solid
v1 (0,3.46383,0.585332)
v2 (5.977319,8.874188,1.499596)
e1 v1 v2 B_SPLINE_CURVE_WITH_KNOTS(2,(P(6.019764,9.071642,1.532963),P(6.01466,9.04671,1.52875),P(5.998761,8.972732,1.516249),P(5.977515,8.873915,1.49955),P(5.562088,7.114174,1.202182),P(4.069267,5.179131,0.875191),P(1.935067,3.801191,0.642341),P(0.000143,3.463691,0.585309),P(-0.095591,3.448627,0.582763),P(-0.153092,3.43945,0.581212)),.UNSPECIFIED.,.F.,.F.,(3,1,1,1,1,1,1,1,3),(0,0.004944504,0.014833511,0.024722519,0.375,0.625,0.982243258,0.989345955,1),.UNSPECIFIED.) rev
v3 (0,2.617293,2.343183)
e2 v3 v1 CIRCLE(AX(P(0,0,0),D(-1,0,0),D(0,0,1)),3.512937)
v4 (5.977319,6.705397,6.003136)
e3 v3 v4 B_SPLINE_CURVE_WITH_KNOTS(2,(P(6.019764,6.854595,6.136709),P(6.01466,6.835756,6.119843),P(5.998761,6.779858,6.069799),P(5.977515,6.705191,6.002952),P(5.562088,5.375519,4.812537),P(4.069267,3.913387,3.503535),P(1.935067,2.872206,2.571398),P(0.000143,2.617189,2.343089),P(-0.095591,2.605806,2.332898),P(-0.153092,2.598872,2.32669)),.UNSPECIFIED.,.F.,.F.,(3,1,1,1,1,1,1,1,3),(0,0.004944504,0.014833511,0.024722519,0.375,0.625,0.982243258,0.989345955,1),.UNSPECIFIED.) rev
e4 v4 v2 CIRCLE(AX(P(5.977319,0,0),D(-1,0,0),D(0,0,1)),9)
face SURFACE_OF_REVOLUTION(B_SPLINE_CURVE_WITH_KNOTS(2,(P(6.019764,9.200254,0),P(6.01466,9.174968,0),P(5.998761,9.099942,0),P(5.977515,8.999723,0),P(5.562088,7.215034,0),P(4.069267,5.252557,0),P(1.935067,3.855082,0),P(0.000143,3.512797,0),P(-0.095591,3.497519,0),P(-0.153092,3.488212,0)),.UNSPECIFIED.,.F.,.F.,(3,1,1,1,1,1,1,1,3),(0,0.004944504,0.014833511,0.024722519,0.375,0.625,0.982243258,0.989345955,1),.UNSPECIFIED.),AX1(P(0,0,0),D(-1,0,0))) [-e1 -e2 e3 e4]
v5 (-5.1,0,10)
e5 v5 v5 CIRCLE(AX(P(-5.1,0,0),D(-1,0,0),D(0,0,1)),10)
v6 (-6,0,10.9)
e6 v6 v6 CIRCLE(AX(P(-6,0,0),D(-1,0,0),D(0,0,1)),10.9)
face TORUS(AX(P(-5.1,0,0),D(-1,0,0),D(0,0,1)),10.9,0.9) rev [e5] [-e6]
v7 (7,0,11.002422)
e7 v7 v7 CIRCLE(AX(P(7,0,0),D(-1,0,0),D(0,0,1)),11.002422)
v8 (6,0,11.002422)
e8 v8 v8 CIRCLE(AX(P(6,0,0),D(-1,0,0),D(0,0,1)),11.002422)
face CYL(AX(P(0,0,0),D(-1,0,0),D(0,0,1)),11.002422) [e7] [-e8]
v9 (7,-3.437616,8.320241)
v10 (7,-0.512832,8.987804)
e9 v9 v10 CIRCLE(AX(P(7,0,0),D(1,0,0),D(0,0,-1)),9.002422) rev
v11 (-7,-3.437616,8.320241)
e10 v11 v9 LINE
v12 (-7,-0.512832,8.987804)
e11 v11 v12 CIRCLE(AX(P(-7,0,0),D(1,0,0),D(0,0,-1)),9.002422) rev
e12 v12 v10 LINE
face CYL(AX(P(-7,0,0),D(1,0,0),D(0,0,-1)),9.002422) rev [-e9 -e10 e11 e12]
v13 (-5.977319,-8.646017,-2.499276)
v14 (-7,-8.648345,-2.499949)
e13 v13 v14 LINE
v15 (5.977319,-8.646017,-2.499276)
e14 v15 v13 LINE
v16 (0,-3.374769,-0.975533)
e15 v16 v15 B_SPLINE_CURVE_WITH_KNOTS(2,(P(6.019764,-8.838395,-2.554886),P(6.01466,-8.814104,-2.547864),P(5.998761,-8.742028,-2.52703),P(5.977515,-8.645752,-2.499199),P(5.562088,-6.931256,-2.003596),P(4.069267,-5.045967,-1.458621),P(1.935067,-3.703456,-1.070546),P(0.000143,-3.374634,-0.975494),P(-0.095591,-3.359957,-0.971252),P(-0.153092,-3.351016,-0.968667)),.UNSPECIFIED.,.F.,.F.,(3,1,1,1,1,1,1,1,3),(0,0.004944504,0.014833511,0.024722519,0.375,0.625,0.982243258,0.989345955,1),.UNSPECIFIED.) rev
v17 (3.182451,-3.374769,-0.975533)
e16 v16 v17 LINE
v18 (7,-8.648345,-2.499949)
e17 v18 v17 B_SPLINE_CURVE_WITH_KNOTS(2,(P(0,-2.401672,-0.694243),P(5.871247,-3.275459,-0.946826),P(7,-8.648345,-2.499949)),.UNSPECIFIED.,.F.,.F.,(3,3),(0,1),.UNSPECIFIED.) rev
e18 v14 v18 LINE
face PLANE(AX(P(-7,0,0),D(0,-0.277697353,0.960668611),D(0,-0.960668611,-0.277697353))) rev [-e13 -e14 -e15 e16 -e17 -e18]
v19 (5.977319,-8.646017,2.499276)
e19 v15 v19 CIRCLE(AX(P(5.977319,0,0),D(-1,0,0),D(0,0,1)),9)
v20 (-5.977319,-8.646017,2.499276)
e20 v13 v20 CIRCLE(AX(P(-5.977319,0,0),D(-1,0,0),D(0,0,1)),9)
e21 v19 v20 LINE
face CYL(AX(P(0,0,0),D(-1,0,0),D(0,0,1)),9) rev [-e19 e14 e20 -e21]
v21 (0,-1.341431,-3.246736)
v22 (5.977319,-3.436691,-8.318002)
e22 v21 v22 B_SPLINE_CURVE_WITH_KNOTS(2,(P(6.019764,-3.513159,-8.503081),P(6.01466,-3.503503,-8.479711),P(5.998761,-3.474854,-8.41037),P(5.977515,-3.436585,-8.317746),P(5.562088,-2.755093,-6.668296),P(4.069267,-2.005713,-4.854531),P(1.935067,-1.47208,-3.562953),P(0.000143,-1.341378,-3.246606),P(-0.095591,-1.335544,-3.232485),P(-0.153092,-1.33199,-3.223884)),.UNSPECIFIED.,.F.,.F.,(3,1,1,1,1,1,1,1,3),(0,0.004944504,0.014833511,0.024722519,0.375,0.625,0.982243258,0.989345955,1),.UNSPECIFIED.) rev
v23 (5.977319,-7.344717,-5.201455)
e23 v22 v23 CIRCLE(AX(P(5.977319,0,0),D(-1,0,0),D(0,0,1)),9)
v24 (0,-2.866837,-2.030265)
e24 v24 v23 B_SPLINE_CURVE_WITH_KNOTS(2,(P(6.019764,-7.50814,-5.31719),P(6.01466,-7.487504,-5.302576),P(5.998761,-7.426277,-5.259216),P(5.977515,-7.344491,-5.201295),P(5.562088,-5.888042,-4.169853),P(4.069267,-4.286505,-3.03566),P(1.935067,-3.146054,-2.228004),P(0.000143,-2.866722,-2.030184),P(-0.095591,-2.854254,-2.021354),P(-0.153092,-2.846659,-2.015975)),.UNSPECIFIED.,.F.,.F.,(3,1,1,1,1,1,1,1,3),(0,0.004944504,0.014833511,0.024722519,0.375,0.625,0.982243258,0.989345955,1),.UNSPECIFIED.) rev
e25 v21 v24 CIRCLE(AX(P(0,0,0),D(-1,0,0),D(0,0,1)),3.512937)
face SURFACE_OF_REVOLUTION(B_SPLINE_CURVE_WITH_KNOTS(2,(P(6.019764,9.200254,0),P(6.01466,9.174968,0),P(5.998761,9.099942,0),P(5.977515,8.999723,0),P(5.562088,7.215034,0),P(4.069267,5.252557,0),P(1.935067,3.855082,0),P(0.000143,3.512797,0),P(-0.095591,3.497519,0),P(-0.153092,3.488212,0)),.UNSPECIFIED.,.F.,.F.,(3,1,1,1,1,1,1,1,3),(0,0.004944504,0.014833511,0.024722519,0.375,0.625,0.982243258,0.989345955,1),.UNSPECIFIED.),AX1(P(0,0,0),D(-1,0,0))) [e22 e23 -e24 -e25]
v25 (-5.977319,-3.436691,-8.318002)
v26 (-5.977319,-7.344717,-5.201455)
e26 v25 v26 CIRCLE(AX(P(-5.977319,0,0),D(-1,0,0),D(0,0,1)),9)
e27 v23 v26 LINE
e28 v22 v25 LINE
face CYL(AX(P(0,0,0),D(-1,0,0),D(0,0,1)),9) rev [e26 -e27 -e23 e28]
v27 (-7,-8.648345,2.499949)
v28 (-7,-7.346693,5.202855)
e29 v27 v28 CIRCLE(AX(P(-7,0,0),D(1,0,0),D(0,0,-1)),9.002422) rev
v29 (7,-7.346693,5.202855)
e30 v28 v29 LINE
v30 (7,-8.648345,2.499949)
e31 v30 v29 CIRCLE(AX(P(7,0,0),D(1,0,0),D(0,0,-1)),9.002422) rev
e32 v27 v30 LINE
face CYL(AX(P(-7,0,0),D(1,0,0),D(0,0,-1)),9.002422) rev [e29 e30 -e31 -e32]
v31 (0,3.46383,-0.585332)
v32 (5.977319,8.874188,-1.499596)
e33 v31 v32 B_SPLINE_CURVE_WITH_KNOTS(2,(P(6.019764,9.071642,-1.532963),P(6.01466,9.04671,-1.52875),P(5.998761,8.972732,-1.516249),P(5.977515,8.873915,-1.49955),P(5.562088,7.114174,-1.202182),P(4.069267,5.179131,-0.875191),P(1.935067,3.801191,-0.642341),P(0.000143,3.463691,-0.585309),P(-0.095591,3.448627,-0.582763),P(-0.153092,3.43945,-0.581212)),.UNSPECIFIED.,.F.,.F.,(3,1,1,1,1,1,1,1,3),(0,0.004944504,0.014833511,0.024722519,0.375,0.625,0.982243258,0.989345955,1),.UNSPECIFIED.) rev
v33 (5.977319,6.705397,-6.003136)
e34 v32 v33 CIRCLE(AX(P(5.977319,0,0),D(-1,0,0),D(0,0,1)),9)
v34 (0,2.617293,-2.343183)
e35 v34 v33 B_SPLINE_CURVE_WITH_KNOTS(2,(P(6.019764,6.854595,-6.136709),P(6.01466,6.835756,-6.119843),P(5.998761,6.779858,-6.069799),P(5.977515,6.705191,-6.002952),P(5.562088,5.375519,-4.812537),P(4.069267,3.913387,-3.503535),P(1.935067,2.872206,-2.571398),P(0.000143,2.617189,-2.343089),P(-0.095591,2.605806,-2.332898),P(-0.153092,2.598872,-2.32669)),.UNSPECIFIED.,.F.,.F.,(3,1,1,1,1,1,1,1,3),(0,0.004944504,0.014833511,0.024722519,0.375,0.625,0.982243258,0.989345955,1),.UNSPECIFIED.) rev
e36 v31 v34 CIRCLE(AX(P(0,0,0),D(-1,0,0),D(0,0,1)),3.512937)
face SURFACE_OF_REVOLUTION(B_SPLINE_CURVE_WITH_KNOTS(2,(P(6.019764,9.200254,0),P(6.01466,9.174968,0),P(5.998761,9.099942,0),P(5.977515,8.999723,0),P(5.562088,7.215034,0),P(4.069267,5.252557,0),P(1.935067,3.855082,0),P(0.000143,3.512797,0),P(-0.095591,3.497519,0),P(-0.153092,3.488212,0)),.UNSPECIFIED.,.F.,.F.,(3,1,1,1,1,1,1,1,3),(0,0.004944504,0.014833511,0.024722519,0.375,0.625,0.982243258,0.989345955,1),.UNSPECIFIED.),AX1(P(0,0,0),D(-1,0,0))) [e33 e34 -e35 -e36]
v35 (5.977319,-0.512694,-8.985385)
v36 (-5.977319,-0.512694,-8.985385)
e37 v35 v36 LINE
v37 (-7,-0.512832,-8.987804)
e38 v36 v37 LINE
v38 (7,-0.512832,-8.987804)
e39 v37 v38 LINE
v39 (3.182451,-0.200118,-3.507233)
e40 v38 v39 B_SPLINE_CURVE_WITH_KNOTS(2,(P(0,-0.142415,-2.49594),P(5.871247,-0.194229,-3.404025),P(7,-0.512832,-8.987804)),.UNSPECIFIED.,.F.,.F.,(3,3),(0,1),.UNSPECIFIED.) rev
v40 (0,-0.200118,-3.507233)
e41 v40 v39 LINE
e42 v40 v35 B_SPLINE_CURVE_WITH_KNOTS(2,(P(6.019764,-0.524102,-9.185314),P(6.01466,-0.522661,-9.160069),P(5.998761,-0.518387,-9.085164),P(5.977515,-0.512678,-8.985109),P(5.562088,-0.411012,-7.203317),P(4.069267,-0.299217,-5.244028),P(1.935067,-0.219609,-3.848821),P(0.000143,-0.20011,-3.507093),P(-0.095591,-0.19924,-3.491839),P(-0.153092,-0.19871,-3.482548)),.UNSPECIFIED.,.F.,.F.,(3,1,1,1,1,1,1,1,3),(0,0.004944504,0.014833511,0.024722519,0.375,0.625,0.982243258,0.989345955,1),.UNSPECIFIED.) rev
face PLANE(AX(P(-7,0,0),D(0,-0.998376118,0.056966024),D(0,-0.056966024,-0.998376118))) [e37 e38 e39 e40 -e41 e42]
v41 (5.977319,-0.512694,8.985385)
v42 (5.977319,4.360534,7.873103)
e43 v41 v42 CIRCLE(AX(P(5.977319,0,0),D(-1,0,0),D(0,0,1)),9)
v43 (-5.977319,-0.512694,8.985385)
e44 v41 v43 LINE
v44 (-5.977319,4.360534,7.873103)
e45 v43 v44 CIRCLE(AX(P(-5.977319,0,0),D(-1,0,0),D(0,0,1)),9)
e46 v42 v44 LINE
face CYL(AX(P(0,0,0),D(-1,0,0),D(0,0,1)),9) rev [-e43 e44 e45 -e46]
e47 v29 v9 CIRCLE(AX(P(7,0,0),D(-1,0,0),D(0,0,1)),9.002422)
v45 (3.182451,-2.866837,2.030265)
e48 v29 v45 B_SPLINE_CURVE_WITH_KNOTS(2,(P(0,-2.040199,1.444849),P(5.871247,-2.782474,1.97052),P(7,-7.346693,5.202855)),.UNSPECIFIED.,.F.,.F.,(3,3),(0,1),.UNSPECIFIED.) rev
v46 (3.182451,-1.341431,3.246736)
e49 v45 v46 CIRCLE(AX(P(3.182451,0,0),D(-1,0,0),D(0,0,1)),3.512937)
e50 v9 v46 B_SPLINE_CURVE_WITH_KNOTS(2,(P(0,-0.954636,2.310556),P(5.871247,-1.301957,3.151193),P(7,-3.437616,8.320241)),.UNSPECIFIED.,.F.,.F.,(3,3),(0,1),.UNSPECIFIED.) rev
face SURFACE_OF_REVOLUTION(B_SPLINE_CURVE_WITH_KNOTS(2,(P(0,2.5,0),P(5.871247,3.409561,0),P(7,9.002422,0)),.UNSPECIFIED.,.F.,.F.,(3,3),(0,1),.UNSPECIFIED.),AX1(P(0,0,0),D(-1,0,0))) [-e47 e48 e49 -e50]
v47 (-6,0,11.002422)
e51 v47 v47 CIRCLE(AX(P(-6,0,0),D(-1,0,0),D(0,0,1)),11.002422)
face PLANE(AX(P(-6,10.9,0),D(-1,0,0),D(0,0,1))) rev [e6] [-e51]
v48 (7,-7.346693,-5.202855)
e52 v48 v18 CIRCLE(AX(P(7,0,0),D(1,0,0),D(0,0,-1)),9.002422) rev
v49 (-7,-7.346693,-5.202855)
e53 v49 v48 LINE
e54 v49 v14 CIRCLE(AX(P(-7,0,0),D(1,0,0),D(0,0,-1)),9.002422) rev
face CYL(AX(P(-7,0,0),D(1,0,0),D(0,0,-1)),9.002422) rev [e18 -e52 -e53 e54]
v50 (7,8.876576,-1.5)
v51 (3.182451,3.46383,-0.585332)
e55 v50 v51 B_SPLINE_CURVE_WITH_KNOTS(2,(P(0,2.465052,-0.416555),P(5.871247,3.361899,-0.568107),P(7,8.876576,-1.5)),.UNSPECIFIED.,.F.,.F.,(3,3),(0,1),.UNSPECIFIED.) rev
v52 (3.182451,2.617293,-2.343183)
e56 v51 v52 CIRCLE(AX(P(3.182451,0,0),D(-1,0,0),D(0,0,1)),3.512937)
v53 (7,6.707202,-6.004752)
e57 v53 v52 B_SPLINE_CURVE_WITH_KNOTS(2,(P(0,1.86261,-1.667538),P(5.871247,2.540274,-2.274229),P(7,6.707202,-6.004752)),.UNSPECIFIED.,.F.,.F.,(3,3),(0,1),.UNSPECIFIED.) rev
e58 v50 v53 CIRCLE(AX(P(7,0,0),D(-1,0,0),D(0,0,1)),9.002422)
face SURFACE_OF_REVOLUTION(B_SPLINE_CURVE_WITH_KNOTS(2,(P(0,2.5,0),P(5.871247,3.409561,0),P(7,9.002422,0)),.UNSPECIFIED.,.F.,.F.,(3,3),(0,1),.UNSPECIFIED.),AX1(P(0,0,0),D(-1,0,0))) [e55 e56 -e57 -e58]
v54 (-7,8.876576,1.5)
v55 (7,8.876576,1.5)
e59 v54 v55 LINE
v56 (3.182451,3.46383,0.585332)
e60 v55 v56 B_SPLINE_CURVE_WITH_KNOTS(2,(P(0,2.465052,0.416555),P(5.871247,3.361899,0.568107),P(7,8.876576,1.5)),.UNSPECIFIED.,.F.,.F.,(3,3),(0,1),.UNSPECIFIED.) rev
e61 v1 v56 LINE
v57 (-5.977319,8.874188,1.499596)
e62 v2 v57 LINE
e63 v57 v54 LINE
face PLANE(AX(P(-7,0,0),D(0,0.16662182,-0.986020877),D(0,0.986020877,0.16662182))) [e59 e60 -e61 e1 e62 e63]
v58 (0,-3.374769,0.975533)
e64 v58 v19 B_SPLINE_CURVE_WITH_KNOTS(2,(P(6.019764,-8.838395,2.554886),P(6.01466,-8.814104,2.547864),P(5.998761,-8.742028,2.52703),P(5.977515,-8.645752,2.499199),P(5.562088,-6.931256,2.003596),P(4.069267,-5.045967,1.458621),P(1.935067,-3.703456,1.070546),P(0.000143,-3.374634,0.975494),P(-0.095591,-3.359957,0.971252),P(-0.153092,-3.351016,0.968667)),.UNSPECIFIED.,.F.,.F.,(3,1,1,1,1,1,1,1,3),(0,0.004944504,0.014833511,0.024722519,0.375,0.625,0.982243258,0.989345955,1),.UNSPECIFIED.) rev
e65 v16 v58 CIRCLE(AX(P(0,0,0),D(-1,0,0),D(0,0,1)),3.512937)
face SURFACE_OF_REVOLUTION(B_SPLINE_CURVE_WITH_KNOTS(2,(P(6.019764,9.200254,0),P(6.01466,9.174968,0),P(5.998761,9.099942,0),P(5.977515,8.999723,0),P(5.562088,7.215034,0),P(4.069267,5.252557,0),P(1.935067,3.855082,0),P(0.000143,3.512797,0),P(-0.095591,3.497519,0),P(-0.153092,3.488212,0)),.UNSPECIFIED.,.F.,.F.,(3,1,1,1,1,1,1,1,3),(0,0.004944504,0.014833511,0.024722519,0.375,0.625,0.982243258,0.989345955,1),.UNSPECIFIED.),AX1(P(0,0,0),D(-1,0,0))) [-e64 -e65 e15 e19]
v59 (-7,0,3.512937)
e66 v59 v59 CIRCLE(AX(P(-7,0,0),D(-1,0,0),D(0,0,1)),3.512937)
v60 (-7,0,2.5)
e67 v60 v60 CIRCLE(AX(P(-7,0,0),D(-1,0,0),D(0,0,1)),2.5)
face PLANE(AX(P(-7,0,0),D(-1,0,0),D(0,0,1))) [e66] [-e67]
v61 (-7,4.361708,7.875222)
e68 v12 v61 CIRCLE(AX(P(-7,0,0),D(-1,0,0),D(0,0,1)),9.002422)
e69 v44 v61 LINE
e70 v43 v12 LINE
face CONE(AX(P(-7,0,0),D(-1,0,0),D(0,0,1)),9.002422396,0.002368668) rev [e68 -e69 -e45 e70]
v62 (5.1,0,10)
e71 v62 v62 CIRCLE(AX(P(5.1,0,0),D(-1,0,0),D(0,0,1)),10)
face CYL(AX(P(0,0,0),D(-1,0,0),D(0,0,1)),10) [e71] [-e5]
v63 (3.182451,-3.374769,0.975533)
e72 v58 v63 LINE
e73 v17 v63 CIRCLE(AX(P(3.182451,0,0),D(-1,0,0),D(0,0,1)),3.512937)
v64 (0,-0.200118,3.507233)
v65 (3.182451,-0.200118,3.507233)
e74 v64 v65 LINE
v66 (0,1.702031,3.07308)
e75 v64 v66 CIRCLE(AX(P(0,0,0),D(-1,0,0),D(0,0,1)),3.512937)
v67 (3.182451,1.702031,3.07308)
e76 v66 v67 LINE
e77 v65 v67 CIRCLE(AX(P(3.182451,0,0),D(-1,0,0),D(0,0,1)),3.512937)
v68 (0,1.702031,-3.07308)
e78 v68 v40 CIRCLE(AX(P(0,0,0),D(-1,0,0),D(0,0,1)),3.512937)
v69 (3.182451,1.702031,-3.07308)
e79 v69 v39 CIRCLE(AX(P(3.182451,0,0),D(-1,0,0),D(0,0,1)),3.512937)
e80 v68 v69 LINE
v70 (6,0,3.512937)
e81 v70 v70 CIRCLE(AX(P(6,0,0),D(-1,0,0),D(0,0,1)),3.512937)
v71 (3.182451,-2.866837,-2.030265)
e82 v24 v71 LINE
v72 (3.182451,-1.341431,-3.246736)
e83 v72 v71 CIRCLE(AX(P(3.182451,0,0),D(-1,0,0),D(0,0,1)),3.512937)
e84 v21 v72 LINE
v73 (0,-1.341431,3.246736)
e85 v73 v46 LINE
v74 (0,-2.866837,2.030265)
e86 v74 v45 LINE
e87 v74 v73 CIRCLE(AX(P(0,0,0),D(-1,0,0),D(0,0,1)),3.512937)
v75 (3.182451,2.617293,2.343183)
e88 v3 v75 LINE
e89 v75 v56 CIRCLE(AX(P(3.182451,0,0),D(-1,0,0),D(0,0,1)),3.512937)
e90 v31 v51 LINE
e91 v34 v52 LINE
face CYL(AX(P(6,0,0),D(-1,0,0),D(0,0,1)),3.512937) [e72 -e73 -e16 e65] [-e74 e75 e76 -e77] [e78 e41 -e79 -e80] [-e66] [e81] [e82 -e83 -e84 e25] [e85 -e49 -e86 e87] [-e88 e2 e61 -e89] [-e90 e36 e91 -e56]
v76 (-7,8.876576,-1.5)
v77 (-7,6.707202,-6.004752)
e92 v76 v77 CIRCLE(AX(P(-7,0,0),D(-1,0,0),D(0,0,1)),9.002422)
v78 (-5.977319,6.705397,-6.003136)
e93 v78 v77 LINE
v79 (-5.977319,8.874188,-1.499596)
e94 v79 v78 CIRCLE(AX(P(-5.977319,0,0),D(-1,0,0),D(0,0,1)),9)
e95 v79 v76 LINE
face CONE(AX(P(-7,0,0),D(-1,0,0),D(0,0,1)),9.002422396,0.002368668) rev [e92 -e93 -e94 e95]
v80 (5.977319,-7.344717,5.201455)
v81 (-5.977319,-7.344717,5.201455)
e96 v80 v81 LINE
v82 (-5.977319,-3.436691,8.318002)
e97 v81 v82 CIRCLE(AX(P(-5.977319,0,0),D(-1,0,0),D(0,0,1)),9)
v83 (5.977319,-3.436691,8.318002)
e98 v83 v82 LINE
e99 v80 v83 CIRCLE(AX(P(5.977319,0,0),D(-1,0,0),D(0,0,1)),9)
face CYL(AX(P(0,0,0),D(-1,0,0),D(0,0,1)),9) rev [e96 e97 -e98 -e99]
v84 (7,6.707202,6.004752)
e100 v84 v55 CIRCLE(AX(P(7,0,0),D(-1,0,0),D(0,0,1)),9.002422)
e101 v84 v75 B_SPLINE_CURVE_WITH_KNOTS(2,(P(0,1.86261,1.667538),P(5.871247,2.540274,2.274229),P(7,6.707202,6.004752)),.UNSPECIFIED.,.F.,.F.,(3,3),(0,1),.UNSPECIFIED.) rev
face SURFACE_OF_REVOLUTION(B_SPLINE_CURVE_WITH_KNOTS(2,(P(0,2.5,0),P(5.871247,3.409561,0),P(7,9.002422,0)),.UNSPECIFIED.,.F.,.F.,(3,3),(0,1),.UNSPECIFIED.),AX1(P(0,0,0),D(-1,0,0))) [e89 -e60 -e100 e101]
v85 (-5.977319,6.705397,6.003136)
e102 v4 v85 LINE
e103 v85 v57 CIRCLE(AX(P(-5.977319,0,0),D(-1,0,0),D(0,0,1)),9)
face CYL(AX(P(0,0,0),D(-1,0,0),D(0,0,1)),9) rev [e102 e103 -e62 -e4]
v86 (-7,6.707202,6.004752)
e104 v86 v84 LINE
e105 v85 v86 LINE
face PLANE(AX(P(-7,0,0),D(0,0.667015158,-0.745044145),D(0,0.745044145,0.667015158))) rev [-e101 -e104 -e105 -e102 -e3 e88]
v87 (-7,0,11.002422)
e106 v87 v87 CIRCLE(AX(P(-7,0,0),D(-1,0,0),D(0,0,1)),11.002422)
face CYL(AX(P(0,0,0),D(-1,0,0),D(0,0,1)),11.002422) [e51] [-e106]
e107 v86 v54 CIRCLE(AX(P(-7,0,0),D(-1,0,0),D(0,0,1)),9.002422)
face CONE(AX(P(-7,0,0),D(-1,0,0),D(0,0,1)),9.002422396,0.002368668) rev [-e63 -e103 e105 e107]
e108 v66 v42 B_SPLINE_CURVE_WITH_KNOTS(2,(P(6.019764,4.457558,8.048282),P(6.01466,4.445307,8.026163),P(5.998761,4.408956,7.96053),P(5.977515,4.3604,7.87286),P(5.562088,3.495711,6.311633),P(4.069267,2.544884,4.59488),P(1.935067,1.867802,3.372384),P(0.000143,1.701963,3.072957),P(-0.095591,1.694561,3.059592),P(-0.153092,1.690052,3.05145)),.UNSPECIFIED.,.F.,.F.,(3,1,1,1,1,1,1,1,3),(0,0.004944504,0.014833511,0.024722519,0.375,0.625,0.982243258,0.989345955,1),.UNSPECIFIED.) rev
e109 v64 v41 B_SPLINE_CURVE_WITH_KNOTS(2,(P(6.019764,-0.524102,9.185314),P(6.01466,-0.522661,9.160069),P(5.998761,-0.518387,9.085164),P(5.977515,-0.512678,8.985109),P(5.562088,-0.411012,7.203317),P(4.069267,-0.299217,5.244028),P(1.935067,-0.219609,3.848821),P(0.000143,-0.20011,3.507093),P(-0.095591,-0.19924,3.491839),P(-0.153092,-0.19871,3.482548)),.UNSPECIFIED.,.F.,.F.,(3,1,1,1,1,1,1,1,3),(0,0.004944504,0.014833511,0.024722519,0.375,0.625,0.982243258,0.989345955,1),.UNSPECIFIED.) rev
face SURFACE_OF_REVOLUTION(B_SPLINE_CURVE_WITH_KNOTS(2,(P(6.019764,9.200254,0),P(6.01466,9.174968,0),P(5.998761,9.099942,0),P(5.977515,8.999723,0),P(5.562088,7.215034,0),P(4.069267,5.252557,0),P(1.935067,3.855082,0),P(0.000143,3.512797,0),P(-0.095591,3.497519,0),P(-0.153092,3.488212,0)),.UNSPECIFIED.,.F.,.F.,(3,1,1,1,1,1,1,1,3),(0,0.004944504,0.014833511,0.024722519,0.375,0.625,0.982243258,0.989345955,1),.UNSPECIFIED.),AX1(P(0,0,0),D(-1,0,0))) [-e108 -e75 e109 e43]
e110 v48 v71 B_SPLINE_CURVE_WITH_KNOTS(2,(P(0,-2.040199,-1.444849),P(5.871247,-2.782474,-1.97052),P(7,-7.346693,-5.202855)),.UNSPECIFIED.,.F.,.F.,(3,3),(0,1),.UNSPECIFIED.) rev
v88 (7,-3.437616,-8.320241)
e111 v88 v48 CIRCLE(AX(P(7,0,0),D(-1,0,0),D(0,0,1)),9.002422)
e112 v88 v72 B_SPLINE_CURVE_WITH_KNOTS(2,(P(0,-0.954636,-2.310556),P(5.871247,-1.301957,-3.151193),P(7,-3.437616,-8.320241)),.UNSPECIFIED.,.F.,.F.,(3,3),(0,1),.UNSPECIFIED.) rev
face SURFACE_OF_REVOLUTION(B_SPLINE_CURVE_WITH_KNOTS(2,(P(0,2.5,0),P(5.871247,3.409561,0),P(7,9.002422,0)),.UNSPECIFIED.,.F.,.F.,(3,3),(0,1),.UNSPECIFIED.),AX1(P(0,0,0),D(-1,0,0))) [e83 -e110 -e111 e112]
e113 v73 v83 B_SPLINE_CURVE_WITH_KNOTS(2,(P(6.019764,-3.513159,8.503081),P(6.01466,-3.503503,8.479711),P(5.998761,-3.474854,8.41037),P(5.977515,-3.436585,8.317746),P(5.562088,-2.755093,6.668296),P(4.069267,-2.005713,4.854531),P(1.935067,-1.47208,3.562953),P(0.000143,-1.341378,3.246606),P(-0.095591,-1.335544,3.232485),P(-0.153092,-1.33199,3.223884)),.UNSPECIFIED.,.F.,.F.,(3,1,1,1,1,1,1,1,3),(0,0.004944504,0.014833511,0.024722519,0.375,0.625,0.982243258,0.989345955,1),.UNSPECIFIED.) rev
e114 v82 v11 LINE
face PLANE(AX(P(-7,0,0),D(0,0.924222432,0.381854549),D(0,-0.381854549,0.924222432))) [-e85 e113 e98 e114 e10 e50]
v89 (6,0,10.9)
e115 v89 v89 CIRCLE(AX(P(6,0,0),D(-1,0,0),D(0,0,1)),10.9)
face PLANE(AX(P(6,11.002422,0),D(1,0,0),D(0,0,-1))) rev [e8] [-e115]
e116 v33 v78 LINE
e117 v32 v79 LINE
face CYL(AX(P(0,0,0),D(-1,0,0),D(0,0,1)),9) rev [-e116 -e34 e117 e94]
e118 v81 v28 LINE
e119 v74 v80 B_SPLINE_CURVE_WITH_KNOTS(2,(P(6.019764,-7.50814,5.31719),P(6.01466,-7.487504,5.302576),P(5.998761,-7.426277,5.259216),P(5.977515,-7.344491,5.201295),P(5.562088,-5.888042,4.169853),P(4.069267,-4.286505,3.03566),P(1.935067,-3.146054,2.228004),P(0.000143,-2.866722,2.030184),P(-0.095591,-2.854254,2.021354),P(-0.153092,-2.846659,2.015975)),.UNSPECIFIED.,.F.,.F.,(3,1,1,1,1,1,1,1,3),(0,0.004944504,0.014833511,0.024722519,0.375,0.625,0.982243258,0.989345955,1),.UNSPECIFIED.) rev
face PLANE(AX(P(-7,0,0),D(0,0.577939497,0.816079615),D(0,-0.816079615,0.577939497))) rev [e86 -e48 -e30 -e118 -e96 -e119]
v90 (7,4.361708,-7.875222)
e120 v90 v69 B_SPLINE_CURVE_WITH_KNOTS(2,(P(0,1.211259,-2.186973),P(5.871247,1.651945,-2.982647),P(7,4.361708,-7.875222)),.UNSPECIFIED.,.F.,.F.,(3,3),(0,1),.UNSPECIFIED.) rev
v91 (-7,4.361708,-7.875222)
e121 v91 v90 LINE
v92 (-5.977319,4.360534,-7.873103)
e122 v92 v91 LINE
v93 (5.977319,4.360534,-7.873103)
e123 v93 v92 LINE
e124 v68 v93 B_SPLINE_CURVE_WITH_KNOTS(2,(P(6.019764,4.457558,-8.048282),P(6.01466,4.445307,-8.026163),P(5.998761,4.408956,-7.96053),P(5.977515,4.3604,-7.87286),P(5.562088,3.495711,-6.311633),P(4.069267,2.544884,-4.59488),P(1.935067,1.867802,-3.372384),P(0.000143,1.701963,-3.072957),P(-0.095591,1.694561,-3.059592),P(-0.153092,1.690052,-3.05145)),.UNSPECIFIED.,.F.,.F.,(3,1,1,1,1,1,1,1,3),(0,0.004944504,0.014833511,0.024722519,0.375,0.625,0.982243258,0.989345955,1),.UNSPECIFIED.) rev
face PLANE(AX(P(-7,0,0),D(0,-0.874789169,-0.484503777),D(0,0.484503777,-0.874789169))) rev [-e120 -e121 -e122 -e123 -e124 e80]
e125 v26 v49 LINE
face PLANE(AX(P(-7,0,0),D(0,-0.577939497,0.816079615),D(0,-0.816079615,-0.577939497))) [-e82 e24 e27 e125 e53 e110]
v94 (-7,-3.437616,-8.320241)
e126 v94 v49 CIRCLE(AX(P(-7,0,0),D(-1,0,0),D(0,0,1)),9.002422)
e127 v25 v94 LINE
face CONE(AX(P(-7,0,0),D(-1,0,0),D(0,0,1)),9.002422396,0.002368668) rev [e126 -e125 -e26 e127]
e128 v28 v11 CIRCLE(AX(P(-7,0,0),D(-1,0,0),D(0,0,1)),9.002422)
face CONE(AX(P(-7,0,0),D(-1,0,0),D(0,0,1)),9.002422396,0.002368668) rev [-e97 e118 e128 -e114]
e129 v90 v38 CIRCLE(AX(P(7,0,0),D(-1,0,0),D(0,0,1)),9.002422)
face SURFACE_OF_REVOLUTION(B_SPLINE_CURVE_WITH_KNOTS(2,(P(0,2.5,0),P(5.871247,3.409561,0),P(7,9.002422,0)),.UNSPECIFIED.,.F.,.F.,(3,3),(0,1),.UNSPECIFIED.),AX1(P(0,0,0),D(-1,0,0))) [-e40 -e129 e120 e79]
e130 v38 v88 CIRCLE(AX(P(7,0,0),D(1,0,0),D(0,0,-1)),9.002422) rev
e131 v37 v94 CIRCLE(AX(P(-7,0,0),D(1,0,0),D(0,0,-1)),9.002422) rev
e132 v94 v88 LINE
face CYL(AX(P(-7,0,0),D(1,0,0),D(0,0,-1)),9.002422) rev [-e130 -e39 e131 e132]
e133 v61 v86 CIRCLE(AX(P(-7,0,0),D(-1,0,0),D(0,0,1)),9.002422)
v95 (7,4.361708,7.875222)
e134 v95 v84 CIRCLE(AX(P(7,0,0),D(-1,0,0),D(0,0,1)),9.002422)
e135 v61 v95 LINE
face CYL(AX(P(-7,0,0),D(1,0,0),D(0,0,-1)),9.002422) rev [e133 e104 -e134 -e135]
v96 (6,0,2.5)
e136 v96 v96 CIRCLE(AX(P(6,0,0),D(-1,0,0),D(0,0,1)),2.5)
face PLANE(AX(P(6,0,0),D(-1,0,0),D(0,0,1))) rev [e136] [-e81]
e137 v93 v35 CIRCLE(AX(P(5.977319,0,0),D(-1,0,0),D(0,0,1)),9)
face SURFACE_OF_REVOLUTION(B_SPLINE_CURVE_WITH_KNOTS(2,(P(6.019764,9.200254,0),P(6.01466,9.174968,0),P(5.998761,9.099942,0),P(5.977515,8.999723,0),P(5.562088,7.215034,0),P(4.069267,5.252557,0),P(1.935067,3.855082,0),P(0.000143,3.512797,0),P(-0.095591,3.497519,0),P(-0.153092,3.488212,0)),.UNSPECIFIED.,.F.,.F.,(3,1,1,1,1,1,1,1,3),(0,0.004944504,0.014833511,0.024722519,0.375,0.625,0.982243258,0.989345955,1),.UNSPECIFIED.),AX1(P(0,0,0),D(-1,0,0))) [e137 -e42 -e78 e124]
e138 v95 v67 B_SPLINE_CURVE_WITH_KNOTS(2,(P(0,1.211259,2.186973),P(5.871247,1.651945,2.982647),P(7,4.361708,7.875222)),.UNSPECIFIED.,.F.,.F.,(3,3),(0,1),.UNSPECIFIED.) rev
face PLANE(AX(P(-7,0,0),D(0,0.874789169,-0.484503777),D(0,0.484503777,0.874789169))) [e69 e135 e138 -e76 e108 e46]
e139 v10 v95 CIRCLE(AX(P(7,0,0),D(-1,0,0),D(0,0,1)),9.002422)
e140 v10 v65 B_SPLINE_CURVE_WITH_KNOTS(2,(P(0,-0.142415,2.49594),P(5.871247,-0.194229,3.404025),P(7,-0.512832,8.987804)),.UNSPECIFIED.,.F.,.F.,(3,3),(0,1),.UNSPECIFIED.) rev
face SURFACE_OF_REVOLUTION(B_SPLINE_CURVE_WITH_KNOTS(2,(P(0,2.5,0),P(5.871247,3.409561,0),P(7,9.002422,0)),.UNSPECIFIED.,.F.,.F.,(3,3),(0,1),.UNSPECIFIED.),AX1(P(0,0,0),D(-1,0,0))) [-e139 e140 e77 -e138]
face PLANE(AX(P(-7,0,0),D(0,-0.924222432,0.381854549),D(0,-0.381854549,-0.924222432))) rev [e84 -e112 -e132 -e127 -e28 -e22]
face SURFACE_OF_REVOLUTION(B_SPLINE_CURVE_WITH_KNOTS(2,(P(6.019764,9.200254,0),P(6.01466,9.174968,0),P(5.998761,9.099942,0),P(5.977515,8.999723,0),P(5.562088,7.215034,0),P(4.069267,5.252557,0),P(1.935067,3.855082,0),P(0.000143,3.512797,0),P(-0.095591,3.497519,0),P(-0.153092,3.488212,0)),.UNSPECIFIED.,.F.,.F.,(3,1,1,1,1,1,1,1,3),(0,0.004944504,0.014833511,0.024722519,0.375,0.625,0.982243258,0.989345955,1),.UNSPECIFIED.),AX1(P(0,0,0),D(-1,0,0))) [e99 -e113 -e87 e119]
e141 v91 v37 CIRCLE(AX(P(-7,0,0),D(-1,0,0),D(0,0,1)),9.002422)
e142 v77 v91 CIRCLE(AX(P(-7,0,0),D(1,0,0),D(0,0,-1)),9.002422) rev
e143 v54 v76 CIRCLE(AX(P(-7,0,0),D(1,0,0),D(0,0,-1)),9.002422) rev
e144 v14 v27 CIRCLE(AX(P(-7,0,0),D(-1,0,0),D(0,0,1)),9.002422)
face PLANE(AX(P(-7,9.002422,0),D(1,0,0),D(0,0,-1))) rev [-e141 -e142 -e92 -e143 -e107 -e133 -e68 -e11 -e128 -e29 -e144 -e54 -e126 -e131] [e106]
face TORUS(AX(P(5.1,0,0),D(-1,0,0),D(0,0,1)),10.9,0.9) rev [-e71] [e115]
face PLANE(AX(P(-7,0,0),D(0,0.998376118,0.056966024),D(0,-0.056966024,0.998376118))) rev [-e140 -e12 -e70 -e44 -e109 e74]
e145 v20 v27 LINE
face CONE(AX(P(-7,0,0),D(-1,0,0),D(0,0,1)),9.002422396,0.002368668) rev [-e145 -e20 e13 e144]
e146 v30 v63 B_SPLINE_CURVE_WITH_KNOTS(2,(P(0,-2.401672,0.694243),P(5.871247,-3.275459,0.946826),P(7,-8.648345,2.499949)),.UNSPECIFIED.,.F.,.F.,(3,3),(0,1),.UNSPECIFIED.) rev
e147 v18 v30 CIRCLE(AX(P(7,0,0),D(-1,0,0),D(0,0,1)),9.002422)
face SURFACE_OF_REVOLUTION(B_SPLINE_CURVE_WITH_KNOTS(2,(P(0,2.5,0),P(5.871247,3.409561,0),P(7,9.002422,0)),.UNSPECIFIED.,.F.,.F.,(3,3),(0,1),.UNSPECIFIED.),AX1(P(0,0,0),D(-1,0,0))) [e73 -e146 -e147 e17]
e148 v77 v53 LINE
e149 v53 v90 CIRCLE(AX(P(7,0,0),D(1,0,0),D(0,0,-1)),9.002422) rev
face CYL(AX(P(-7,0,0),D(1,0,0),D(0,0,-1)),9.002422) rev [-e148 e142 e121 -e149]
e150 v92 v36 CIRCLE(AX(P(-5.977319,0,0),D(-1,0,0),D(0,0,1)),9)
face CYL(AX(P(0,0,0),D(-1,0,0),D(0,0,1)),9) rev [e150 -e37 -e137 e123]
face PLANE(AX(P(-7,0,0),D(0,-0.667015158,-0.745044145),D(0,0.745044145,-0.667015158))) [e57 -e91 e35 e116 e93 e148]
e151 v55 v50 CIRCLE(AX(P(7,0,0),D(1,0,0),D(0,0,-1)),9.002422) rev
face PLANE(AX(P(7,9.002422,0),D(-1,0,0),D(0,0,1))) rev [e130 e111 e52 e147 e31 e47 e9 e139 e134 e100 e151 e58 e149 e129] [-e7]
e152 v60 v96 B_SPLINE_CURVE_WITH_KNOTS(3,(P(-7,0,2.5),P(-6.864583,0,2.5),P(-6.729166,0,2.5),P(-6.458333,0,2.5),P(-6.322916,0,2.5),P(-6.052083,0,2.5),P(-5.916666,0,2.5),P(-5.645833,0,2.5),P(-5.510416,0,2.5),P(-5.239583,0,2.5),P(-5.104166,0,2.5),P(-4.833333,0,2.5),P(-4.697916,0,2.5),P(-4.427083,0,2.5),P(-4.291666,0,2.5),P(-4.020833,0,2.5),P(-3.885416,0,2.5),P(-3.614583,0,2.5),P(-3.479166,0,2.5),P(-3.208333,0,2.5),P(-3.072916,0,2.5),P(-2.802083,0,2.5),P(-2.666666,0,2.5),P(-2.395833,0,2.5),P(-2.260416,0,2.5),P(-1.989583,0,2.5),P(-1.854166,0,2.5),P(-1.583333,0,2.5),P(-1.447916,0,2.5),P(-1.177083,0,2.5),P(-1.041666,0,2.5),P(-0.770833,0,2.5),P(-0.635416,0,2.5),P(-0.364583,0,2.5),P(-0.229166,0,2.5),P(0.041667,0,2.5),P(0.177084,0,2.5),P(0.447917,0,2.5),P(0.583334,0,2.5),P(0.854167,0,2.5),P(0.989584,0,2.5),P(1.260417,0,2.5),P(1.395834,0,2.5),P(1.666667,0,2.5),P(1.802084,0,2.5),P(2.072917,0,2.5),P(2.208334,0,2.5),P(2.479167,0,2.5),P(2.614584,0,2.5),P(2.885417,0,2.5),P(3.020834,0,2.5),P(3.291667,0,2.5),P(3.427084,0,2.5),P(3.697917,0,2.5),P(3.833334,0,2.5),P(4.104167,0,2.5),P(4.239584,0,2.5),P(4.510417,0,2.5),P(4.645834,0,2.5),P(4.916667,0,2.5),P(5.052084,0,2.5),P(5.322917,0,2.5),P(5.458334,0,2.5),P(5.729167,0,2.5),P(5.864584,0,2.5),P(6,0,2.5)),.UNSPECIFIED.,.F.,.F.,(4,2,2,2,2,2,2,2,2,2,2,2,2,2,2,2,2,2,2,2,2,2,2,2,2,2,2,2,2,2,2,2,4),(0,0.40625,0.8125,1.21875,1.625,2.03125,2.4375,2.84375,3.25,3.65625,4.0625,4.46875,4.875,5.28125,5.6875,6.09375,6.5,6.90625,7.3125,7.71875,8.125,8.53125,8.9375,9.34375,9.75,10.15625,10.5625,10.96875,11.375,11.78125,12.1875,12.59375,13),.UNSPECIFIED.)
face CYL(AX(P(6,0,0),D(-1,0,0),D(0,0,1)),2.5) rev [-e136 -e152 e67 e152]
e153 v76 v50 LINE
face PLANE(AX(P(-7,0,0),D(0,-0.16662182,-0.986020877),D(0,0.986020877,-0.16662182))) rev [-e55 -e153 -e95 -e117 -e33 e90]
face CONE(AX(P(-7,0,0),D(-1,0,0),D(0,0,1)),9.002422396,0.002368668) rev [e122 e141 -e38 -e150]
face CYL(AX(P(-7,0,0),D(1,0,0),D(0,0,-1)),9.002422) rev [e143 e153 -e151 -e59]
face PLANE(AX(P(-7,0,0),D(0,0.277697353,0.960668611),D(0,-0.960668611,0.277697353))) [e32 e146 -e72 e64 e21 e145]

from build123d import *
from build123d.topology import SkipClean

# Parameters (mm, degrees)
SKETCH3_R           = 3.512937447
SKETCH3_R_2         = 2.5
BOSS_EXTRUDE3_DEPTH = 13
SKETCH5_R           = 2.5
CUT_EXTRUDE9_DEPTH  = 21.930995525


with BuildPart() as part:
    # Sketch1 → Revolve1 (revolve)
    with BuildSketch(Plane.XY):
        with BuildLine():
            Line((-5.977318778, 9), (5.977318778, 9))
            add(Edge.make_bspline(
                [(5.977318778, 9), (5.971811367, 8.975222227), (5.562087836, 7.215033632), (4.069266539, 5.252557202), (1.935066771, 3.855081597), (0.019003444, 3.516133425), (0, 3.512937447)],
                knots=[0.019778015, 0.019778015, 0.019778015, 0.024722519, 0.375, 0.625, 0.982243258, 0.985794607, 0.985794607, 0.985794607], degree=2))
            Line((0, 3.512937447), (0, 2.5))
            add(Edge.make_bspline(
                [(6.999999581, 9.002422396), (5.87124706, 3.409561407), (0, 2.5)],
                knots=[0, 0, 0, 1, 1, 1], degree=2))
            Line((6.999999581, 9.002422396), (6.999999581, 11.002422396))
            Line((6.999999581, 11.002422396), (5.999999581, 11.002422396))
            Line((5.999999581, 11.002422396), (5.999999581, 10.9))
            ThreePointArc((5.999999581, 10.9), (5.736395684, 10.263603897), (5.099999581, 10))
            Line((5.099999581, 10), (-5.099999581, 10))
            ThreePointArc((-5.099999581, 10), (-5.736395684, 10.263603897), (-5.999999581, 10.9))
            Line((-5.999999581, 10.9), (-5.999999581, 11.002422396))
            Line((-5.999999581, 11.002422396), (-6.999999581, 11.002422396))
            Line((-6.999999581, 11.002422396), (-6.999999581, 9.002422396))
            Line((-6.999999581, 9.002422396), (-5.977318778, 9))
        make_face()
    revolve(axis=Axis((0, 0, 0), (1, 0, 0)))

    # Sketch3 → Boss-Extrude3 (add)
    with BuildSketch(Plane.ZY.offset(6.999999581)):
        Circle(SKETCH3_R)
        Circle(SKETCH3_R_2, mode=Mode.SUBTRACT)
    extrude(amount=-BOSS_EXTRUDE3_DEPTH)

    # Sketch5 → Cut-Extrude9 (cut, through all)
    with SkipClean():  # the faces are left unmerged after this step: merging them gives an invalid solid
        with BuildSketch(Plane(origin=(6.999999581, 0, 0), x_dir=(0, 0, -1), z_dir=(1, 0, 0))):
            with BuildLine():
                Line((-1.5, 8.876576423), (-0.585332029, 3.463829661))
                ThreePointArc((-0.585332029, 3.463829661), (0, 3.512937447), (0.585332029, 3.463829661))
                Line((0.585332029, 3.463829661), (1.5, 8.876576423))
                ThreePointArc((1.5, 8.876576423), (0, 9.002422396), (-1.5, 8.876576423))
            make_face()
            with BuildLine():
                ThreePointArc((-3.07307963, 1.702031461), (-2.746525092, 2.190280673), (-2.343182528, 2.617293478))
                Line((-2.343182528, 2.617293478), (-6.004752201, 6.707202099))
                ThreePointArc((-6.004752201, 6.707202099), (-7.038377248, 5.612918556), (-7.875221607, 4.361707651))
                Line((-7.875221607, 4.361707651), (-3.07307963, 1.702031461))
            make_face()
            with BuildLine():
                Line((6.004752201, 6.707202099), (2.343182528, 2.617293478))
                ThreePointArc((2.343182528, 2.617293478), (2.746525092, 2.190280673), (3.07307963, 1.702031461))
                Line((3.07307963, 1.702031461), (7.875221607, 4.361707651))
                ThreePointArc((7.875221607, 4.361707651), (7.038377248, 5.612918556), (6.004752201, 6.707202099))
            make_face()
            with BuildLine():
                ThreePointArc((-3.24673559, -1.341431145), (-3.424860771, -0.781702122), (-3.50723285, -0.200118078))
                Line((-3.50723285, -0.200118078), (-8.98780352, -0.512832208))
                ThreePointArc((-8.98780352, -0.512832208), (-8.776712871, -2.003227439), (-8.320240718, -3.437615944))
                Line((-8.320240718, -3.437615944), (-3.24673559, -1.341431145))
            make_face()
            with BuildLine():
                Line((8.98780352, -0.512832208), (3.50723285, -0.200118078))
                ThreePointArc((3.50723285, -0.200118078), (3.424860771, -0.781702122), (3.24673559, -1.341431145))
                Line((3.24673559, -1.341431145), (8.320240718, -3.437615944))
                ThreePointArc((8.320240718, -3.437615944), (8.776712871, -2.003227439), (8.98780352, -0.512832208))
            make_face()
            with BuildLine():
                ThreePointArc((-0.975533429, -3.374768738), (-1.524206435, -3.165047275), (-2.030265301, -2.866836639))
                Line((-2.030265301, -2.866836639), (-5.202855471, -7.346693402))
                ThreePointArc((-5.202855471, -7.346693402), (-3.90600469, -8.110902314), (-2.499948867, -8.648344619))
                Line((-2.499948867, -8.648344619), (-0.975533429, -3.374768738))
            make_face()
            with BuildLine():
                Line((5.202855471, -7.346693402), (2.030265301, -2.866836639))
                ThreePointArc((2.030265301, -2.866836639), (1.524206435, -3.165047275), (0.975533429, -3.374768738))
                Line((0.975533429, -3.374768738), (2.499948867, -8.648344619))
                ThreePointArc((2.499948867, -8.648344619), (3.90600469, -8.110902314), (5.202855471, -7.346693402))
            make_face()
            Circle(SKETCH5_R)
        extrude(amount=-CUT_EXTRUDE9_DEPTH, mode=Mode.SUBTRACT)
    add(part.part.scale(1), mode=Mode.REPLACE)  # the faces are merged on a copy


solid = part.part
